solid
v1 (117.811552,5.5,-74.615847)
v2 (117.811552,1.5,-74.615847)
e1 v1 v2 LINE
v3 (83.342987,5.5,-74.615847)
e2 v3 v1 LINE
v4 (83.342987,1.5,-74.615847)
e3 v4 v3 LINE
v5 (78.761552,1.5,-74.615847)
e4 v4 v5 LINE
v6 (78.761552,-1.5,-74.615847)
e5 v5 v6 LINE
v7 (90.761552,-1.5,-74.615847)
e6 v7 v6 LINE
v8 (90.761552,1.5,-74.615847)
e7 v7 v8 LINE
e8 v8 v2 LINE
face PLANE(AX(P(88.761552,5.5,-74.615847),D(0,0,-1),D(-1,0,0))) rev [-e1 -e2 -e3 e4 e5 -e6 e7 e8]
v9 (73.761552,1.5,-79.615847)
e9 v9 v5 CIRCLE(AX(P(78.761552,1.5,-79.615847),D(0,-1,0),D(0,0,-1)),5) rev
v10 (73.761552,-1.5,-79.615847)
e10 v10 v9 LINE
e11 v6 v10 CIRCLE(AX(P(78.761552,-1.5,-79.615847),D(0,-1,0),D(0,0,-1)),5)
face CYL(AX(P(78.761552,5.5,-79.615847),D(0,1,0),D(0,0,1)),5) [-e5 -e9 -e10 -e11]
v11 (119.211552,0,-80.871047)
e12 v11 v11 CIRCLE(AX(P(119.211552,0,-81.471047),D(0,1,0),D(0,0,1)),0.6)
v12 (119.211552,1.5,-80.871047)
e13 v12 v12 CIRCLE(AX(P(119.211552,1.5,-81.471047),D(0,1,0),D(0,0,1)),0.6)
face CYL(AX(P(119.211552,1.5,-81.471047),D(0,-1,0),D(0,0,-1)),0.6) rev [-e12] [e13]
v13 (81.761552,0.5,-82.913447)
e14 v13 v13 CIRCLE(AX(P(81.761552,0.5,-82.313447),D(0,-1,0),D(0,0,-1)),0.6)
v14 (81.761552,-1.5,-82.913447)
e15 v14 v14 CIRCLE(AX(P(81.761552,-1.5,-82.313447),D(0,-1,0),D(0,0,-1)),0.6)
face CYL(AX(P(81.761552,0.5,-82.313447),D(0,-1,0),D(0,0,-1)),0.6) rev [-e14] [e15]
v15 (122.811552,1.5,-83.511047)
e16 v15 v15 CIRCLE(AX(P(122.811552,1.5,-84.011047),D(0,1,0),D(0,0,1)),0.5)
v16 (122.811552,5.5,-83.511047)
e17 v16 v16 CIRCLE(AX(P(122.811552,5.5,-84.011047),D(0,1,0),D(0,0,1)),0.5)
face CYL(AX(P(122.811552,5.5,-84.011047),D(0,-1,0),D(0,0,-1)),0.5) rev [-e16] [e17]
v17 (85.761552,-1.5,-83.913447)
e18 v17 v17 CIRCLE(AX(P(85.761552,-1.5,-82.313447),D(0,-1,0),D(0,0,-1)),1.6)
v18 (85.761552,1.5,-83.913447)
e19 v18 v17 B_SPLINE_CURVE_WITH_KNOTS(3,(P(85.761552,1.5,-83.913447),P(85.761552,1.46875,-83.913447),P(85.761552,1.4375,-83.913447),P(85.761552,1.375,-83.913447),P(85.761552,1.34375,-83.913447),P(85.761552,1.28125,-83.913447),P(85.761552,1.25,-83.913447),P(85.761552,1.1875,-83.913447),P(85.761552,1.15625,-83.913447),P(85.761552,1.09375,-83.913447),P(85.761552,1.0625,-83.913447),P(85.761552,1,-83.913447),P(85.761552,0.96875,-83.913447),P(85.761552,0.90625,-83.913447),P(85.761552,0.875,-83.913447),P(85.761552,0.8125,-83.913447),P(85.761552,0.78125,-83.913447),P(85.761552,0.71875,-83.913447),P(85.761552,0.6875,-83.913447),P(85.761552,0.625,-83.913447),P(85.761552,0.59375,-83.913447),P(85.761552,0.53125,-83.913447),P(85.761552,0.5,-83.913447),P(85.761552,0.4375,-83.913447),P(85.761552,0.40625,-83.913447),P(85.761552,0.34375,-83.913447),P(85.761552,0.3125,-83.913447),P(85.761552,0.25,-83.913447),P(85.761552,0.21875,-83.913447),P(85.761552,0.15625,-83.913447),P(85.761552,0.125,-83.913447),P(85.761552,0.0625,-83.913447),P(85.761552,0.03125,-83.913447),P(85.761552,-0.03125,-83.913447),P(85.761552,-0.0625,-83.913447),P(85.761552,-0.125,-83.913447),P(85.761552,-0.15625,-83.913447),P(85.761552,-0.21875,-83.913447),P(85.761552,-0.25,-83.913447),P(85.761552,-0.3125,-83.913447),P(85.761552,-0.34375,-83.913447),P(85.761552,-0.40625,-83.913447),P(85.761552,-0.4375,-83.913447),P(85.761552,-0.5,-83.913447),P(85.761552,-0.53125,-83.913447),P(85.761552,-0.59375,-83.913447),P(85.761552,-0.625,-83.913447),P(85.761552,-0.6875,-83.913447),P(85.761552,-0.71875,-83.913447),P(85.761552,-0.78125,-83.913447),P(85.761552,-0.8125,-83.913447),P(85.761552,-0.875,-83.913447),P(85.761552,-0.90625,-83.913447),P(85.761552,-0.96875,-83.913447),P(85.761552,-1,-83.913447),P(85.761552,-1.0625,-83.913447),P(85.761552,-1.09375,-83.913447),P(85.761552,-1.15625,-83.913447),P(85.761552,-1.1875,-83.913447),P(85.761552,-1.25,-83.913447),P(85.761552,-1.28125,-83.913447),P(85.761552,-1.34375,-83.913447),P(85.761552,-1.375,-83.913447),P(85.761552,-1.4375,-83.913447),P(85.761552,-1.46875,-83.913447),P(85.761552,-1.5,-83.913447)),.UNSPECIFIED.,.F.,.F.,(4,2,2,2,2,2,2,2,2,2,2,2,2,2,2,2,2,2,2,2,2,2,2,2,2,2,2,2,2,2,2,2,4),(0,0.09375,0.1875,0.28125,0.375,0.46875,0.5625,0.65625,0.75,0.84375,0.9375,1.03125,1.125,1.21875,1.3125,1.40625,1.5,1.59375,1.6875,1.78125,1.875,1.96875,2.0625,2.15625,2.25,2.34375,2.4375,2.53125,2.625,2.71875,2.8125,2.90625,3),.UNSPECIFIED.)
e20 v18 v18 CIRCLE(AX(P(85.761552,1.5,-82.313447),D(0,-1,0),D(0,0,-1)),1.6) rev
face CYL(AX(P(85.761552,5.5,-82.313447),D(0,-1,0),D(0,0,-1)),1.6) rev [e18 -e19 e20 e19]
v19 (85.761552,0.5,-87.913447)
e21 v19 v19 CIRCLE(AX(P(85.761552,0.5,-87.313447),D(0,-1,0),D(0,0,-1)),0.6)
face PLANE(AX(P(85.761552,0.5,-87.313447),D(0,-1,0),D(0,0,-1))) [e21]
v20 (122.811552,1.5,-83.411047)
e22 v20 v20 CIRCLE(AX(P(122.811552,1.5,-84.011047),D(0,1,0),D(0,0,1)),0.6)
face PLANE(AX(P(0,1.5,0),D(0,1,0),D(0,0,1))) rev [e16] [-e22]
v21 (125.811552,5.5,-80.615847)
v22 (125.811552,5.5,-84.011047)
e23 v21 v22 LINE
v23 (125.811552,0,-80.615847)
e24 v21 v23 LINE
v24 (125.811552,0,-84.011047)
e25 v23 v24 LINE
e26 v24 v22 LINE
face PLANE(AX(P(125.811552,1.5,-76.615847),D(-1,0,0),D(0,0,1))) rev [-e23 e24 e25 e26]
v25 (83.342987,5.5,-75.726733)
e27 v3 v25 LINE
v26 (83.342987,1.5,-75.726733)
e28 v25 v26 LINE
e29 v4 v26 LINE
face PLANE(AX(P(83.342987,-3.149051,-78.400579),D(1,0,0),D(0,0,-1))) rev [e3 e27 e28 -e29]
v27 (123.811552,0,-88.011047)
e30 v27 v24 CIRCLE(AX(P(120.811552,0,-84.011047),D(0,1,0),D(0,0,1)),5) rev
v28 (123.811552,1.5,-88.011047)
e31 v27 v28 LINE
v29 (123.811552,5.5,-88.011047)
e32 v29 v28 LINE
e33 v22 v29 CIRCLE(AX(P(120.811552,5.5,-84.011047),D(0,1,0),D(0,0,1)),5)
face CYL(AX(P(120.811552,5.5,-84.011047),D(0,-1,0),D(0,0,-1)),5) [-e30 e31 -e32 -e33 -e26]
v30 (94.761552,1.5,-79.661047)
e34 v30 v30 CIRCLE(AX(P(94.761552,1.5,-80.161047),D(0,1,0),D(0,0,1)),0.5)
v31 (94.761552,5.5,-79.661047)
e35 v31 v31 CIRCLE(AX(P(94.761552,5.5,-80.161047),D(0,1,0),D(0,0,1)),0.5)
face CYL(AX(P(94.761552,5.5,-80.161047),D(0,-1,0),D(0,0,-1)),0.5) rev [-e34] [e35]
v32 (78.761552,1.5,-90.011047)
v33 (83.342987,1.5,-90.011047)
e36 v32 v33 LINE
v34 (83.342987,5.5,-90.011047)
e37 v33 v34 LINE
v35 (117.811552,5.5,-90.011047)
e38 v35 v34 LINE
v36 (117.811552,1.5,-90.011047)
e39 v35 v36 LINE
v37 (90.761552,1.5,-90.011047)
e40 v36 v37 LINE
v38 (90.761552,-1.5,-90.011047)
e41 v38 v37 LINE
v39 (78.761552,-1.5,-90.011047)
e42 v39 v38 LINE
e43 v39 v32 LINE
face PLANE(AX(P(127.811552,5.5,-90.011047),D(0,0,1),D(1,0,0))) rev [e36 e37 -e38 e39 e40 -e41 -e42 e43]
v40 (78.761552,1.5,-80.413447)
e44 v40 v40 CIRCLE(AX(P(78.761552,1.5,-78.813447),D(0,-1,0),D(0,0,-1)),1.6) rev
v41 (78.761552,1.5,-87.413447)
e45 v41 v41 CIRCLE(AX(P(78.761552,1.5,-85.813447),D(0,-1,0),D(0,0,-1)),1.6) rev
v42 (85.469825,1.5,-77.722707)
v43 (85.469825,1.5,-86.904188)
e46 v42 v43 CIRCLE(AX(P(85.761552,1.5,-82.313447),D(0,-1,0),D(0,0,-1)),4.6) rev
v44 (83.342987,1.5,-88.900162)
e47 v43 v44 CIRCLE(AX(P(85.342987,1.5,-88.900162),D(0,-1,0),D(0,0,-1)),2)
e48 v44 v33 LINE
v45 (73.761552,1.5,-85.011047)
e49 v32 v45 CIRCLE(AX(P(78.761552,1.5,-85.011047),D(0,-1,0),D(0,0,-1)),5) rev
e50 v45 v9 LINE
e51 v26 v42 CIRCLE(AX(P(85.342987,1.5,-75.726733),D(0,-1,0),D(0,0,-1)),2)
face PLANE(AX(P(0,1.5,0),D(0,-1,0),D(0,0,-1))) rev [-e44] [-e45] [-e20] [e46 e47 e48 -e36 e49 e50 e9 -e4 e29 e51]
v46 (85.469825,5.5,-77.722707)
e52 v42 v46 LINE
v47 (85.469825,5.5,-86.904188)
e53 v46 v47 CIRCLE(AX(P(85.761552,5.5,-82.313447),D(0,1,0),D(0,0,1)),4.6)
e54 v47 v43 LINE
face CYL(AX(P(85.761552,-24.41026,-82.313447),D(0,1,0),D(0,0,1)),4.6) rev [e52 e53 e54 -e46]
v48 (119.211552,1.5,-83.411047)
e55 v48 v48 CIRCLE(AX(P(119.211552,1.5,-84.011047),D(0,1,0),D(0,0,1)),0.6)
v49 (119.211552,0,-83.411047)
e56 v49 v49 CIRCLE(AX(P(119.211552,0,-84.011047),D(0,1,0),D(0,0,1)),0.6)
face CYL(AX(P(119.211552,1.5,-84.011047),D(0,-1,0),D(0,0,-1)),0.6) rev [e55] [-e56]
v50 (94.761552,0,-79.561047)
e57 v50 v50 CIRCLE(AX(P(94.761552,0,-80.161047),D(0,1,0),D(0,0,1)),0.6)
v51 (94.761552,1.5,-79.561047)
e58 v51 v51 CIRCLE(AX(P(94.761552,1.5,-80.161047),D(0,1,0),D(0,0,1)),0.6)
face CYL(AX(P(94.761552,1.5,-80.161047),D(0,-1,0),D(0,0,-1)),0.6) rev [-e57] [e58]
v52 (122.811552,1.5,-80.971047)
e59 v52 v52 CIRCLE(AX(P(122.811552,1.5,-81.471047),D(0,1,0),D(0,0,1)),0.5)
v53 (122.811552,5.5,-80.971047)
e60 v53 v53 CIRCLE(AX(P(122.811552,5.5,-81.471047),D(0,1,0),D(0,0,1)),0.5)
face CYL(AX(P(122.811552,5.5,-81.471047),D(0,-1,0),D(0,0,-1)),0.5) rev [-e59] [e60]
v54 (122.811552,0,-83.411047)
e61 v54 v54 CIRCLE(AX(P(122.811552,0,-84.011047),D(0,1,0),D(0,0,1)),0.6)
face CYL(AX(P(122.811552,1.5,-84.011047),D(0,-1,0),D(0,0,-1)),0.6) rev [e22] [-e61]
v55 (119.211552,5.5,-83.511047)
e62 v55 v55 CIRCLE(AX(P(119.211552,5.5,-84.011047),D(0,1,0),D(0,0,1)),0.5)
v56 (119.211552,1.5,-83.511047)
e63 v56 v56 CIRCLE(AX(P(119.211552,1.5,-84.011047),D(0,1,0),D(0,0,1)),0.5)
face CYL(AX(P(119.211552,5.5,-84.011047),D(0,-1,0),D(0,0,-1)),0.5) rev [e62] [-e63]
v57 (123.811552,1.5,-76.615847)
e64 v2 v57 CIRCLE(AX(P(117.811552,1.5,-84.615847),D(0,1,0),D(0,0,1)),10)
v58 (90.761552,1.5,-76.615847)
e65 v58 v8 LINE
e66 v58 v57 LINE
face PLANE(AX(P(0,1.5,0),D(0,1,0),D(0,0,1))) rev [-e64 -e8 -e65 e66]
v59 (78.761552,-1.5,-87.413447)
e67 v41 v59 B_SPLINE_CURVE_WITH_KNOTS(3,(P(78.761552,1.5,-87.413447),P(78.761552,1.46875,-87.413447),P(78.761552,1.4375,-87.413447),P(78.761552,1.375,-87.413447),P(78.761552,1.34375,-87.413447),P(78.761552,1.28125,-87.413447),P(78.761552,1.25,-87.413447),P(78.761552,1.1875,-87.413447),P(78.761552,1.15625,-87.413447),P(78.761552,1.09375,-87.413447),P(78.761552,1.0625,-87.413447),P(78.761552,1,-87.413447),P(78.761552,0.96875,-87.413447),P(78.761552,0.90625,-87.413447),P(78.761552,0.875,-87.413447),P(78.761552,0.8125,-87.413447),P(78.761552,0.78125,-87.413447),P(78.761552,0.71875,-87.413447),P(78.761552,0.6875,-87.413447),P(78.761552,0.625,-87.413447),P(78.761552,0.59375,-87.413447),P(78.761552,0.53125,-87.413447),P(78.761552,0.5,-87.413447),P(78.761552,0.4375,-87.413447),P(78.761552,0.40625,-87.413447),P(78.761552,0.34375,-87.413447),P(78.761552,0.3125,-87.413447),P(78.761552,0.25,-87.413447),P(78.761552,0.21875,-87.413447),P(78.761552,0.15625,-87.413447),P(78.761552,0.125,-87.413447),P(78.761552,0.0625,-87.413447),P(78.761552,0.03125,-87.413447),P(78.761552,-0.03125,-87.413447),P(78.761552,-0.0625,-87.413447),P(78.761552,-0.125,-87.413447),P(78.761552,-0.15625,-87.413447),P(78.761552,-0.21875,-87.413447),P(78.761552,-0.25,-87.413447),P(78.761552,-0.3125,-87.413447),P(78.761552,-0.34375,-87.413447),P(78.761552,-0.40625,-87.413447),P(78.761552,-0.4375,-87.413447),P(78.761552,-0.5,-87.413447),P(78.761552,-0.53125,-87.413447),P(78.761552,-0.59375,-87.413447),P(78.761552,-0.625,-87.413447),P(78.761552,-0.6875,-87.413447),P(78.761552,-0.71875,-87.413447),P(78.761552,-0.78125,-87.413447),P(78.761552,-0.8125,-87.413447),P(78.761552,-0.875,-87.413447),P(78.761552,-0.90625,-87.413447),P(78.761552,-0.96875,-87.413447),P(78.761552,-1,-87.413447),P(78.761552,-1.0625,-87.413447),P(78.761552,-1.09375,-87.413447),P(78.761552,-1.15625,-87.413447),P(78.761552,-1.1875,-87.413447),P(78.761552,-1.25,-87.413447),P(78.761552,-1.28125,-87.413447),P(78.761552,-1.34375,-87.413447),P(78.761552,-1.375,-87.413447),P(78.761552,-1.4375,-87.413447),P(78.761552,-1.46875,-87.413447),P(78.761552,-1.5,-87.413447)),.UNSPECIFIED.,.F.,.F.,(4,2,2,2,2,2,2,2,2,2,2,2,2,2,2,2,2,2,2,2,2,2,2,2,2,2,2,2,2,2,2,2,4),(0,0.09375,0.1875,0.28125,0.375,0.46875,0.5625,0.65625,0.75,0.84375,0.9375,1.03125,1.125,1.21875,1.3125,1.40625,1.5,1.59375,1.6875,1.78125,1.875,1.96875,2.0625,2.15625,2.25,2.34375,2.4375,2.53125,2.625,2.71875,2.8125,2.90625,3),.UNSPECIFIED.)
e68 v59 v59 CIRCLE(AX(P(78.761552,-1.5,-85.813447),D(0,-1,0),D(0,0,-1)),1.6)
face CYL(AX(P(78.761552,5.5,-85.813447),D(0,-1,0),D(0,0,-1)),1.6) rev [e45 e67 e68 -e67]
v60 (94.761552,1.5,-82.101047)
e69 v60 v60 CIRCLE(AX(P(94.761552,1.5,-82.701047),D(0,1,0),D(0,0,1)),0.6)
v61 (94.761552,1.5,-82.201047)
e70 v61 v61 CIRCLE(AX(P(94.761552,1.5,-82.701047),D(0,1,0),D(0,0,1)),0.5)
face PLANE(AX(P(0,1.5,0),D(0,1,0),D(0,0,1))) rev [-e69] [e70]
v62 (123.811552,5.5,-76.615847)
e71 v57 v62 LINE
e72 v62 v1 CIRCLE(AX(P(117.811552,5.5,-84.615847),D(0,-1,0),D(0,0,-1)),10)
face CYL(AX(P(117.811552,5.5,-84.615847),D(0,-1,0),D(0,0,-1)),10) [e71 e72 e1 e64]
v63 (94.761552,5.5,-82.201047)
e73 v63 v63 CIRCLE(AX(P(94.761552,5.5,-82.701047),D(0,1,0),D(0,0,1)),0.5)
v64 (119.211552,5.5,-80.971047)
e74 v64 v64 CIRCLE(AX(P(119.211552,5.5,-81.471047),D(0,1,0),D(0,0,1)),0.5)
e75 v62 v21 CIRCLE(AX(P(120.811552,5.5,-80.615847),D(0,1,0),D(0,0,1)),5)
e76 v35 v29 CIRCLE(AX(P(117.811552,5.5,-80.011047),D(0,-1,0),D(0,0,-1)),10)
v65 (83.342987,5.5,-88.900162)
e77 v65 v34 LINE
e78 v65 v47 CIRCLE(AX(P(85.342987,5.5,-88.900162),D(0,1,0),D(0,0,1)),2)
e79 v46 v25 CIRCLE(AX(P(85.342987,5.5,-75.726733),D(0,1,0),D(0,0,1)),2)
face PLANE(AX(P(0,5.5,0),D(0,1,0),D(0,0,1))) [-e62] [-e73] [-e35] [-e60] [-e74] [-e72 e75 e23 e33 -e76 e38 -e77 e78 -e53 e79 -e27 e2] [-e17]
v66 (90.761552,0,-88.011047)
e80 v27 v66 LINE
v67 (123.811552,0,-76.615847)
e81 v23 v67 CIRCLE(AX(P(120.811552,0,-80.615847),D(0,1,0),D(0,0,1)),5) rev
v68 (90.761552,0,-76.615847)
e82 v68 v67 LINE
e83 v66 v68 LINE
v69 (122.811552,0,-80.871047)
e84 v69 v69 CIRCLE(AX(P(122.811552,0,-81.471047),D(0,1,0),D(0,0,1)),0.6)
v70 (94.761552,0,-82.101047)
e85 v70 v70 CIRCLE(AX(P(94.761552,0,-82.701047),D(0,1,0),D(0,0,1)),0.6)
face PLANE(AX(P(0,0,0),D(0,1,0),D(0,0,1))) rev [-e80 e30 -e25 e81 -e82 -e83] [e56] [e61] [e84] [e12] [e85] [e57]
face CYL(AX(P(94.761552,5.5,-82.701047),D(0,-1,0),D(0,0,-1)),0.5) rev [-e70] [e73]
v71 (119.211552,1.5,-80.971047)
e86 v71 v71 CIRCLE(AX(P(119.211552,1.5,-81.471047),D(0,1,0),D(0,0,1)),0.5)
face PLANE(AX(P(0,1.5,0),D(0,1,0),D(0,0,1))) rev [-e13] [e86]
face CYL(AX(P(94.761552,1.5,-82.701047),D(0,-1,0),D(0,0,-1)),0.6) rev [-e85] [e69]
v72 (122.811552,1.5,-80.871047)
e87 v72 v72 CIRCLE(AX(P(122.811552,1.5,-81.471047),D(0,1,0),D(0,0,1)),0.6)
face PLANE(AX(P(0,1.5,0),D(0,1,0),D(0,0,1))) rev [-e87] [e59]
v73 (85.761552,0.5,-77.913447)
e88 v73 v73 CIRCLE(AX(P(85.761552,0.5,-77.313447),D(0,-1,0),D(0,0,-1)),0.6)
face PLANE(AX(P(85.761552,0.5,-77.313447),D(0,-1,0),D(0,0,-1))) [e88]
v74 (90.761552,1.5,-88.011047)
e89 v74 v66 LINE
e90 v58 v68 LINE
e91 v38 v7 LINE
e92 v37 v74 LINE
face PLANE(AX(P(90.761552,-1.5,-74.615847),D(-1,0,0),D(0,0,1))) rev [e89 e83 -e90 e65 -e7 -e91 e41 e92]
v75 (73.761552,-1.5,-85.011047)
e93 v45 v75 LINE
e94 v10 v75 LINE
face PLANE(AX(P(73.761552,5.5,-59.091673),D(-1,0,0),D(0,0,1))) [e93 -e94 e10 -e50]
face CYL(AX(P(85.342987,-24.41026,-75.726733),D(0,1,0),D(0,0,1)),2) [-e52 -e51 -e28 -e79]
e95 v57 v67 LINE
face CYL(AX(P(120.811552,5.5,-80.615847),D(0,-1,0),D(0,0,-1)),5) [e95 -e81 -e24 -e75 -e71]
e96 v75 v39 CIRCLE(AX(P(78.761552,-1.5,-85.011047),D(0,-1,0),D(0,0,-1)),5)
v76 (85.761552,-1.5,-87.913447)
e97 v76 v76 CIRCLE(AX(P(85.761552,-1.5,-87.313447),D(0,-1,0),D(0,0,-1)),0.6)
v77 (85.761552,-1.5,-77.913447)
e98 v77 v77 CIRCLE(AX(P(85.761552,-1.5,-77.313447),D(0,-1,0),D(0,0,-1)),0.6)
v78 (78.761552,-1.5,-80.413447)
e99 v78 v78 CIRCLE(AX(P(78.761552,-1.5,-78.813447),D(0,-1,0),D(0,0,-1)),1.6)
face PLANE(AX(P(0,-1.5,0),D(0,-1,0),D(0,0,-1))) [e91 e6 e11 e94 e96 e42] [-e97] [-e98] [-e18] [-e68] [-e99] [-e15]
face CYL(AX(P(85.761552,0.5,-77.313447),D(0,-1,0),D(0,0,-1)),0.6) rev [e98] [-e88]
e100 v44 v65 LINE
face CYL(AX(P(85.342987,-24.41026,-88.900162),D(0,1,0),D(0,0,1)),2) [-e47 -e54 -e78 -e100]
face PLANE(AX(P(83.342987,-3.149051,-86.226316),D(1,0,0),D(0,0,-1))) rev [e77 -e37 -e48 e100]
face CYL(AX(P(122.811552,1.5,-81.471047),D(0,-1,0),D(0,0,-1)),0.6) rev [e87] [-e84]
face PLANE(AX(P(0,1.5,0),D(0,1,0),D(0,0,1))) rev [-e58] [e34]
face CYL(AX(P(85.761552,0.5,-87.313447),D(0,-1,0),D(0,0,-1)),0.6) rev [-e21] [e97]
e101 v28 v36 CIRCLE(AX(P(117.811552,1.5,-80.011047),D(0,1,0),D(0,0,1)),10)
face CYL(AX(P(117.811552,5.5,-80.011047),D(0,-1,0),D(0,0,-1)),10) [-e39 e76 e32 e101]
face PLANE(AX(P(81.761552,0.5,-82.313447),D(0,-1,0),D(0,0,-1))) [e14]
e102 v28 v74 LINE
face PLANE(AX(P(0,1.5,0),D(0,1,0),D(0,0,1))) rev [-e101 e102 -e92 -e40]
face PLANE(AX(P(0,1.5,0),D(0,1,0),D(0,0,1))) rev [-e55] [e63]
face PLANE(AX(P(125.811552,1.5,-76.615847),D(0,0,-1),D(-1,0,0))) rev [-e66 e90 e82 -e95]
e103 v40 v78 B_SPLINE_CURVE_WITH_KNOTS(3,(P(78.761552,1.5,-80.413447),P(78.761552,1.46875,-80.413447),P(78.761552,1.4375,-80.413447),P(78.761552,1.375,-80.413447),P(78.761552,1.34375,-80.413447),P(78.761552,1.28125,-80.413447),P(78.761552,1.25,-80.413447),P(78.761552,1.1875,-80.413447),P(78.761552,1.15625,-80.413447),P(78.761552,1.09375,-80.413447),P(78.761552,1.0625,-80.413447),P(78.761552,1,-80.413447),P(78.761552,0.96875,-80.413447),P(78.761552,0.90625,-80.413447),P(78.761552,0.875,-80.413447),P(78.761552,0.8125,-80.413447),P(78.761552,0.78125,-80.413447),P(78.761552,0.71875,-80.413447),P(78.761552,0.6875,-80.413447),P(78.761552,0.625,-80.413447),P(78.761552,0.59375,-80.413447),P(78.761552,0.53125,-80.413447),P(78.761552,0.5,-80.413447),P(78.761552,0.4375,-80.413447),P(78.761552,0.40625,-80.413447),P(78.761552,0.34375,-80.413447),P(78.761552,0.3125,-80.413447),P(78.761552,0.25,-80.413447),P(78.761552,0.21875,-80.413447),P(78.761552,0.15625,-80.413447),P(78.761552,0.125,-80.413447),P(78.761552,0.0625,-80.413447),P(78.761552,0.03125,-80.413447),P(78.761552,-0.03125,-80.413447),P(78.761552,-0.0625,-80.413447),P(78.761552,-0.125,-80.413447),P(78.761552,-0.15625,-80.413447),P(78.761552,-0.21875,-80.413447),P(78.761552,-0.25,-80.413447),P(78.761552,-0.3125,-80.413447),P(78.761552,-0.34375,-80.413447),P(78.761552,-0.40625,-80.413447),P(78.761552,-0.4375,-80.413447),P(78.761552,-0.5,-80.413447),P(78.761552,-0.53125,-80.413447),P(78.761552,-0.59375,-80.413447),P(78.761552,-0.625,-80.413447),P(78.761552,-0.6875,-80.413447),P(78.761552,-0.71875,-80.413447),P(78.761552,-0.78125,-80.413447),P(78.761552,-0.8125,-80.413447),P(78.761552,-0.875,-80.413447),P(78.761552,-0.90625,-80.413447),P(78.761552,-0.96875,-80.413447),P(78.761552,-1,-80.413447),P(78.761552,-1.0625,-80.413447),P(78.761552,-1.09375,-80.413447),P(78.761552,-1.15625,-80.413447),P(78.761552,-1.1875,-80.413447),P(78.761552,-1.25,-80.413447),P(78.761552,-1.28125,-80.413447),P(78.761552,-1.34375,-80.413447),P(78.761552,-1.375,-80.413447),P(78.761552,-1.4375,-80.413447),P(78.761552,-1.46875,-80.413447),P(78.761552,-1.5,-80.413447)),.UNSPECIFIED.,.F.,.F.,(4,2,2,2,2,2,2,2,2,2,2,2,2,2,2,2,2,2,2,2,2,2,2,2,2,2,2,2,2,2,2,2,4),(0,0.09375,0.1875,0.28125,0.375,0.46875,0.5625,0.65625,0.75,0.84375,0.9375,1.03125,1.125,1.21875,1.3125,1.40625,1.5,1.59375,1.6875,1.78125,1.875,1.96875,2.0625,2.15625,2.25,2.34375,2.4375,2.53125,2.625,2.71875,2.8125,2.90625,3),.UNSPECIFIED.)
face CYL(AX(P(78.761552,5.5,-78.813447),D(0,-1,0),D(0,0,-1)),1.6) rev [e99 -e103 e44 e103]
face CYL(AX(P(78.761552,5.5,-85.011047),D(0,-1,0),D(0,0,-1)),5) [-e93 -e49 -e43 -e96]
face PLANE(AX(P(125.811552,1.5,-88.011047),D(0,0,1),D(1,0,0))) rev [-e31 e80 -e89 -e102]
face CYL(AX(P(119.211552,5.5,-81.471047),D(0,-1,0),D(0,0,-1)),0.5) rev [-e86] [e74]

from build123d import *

# Parameters (mm, degrees)
SKETCH_2_W          = 35.05
SKETCH_2_H          = 11.3952
SKETCH_2_R          = 0.6
EXTRUDE_1_DEPTH     = 1.5
SKETCH_3_W          = 39.05
SKETCH_3_H          = 15.3952
SKETCH_3_R          = 0.5
EXTRUDE_2_DEPTH     = 4
SKETCH_4_W          = 15
SKETCH_4_H          = 4
EXTRUDE_3_DEPTH     = 15.3952
SKETCH_5_W          = 17
SKETCH_5_H          = 15.3952
EXTRUDE_4_DEPTH     = 3
SKETCH_6_R          = 1.6
CUT_EXTRUDE_1_DEPTH = 157.48252797
CUT_EXTRUDE_2_DEPTH = 4
CUT_EXTRUDE_4_DEPTH = 4
FILLET_2_R          = 5
CUT_EXTRUDE_5_DEPTH = 4
FILLET_3_R          = 2
SKETCH_10_R         = 0.6
CUT_EXTRUDE_6_DEPTH = 2
CUT_EXTRUDE_7_DEPTH = 157.422605654
CUT_EXTRUDE_8_DEPTH = 156.918332452
FILLET_5_R          = 5


with BuildPart() as part:
    # 草图2 → 凸台-拉伸1 (new body)
    with BuildSketch(Plane(origin=(0, 0, 0), x_dir=(1, 0, 0), z_dir=(0, 1, 0))):
        with Locations((108.28655231, 82.313447411)):
            Rectangle(SKETCH_2_W, SKETCH_2_H)
        with Locations(Location((94.76155231, 82.701047411, 0), (0, 0, 270))):
            Circle(SKETCH_2_R, mode=Mode.SUBTRACT)
        with Locations(Location((94.76155231, 80.161047411, 0), (0, 0, 270))):
            Circle(SKETCH_2_R, mode=Mode.SUBTRACT)
        with Locations(Location((119.21155231, 84.011047411, 0), (0, 0, 270))):
            Circle(SKETCH_2_R, mode=Mode.SUBTRACT)
        with Locations(Location((122.81155231, 84.011047411, 0), (0, 0, 270))):
            Circle(SKETCH_2_R, mode=Mode.SUBTRACT)
        with Locations(Location((122.81155231, 81.471047411, 0), (0, 0, 270))):
            Circle(SKETCH_2_R, mode=Mode.SUBTRACT)
        with Locations(Location((119.21155231, 81.471047411, 0), (0, 0, 270))):
            Circle(SKETCH_2_R, mode=Mode.SUBTRACT)
    extrude(amount=EXTRUDE_1_DEPTH)

    # 草图3 → 凸台-拉伸2 (add)
    with BuildSketch(Plane(origin=(0, 1.5, 0), x_dir=(1, 0, 0), z_dir=(0, 1, 0))):
        with Locations((108.28655231, 82.313447411)):
            Rectangle(SKETCH_3_W, SKETCH_3_H)
        with Locations(Location((94.76155231, 82.701047411, 0), (0, 0, 270))):
            Circle(SKETCH_3_R, mode=Mode.SUBTRACT)
        with Locations(Location((94.76155231, 80.161047411, 0), (0, 0, 270))):
            Circle(SKETCH_3_R, mode=Mode.SUBTRACT)
        with Locations(Location((119.21155231, 84.011047411, 0), (0, 0, 270))):
            Circle(SKETCH_3_R, mode=Mode.SUBTRACT)
        with Locations(Location((122.81155231, 84.011047411, 0), (0, 0, 270))):
            Circle(SKETCH_3_R, mode=Mode.SUBTRACT)
        with Locations(Location((122.81155231, 81.471047411, 0), (0, 0, 270))):
            Circle(SKETCH_3_R, mode=Mode.SUBTRACT)
        with Locations(Location((119.21155231, 81.471047411, 0), (0, 0, 270))):
            Circle(SKETCH_3_R, mode=Mode.SUBTRACT)
    extrude(amount=EXTRUDE_2_DEPTH)

    # 草图4 → 凸台-拉伸3 (add)
    with BuildSketch(Plane(origin=(0, 0, -90.011047411), x_dir=(-1, 0, 0), z_dir=(0, 0, -1))):
        with Locations((-81.26155231, 3.5)):
            Rectangle(SKETCH_4_W, SKETCH_4_H)
    extrude(amount=-EXTRUDE_3_DEPTH)

    # 草图5 → 凸台-拉伸4 (add)
    with BuildSketch(Plane.XZ.offset(-1.5)):
        with Locations((82.26155231, -82.313447411)):
            Rectangle(SKETCH_5_W, SKETCH_5_H)
    extrude(amount=EXTRUDE_4_DEPTH)

    # 草图6 → 切除-拉伸1 (cut, through all)
    with BuildSketch(Plane.XZ.offset(1.5)):
        with Locations(Location((78.76155231, -78.813447411, 0), (0, 0, 270))):
            Circle(SKETCH_6_R)
        with Locations(Location((85.76155231, -82.313447411, 0), (0, 0, 270))):
            Circle(SKETCH_6_R)
        with Locations(Location((78.76155231, -85.813447411, 0), (0, 0, 270))):
            Circle(SKETCH_6_R)
    extrude(amount=-CUT_EXTRUDE_1_DEPTH, mode=Mode.SUBTRACT)

    # 草图7 → 切除-拉伸2 (cut)
    with BuildSketch(Plane(origin=(0, 5.5, 0), x_dir=(1, 0, 0), z_dir=(0, 1, 0))):
        with BuildLine():
            ThreePointArc((83.342986542, 86.226315876), (76.648541293, 89.899421523), (75.776589998, 82.313447411))
            ThreePointArc((75.776589998, 82.313447411), (76.648541293, 74.727473299), (83.342986542, 78.400578945))
            ThreePointArc((83.342986542, 78.400578945), (90.36155231, 82.313447411), (83.342986542, 86.226315876))
        make_face()
    extrude(amount=-CUT_EXTRUDE_2_DEPTH, mode=Mode.SUBTRACT)

    # 草图8 → 切除-拉伸4 (cut)
    with BuildSketch(Plane(origin=(0, 5.5, 0), x_dir=(1, 0, 0), z_dir=(0, 1, 0))):
        with BuildLine():
            Line((76.880022549, 90.011047411), (73.76155231, 90.011047411))
            Line((73.76155231, 90.011047411), (73.76155231, 74.615847411))
            Line((73.76155231, 74.615847411), (76.880022549, 74.615847411))
            ThreePointArc((76.880022549, 74.615847411), (74.208097828, 78.160720601), (75.776589998, 82.313447411))
            ThreePointArc((75.776589998, 82.313447411), (74.208097828, 86.466174221), (76.880022549, 90.011047411))
        make_face()
    extrude(amount=-CUT_EXTRUDE_4_DEPTH, mode=Mode.SUBTRACT)

    # 圆角2
    fillet_2_edges = [part.edges().sort_by_distance(p)[0] for p in [
        (73.76155231, 0, -74.615847411),
        (73.76155231, 0, -90.011047411),
    ]]
    fillet(fillet_2_edges, radius=FILLET_2_R)

    # 草图9 → 切除-拉伸5 (cut)
    with BuildSketch(Plane(origin=(0, 5.5, 0), x_dir=(1, 0, 0), z_dir=(0, 1, 0))):
        Polygon((83.342986542, 86.226315876), (83.342986542, 90.011047411), (80.64308207, 90.011047411), align=None)
        Polygon((83.342986542, 78.400578945), (83.342986542, 74.615847411), (80.64308207, 74.615847411), align=None)
    extrude(amount=-CUT_EXTRUDE_5_DEPTH, mode=Mode.SUBTRACT)

    # 圆角3
    fillet_3_edges = [part.edges().sort_by_distance(p)[0] for p in [
        (83.342986542, 3.5, -78.400578945),
        (83.342986542, 3.5, -86.226315876),
    ]]
    fillet(fillet_3_edges, radius=FILLET_3_R)

    # 草图10 → 切除-拉伸6 (cut)
    with BuildSketch(Plane.XZ.offset(1.5)):
        with Locations(Location((81.76155231, -82.313447411, 0), (0, 0, 270))):
            Circle(SKETCH_10_R)
        with Locations(Location((85.76155231, -77.313447411, 0), (0, 0, 270))):
            Circle(SKETCH_10_R)
        with Locations(Location((85.76155231, -87.313447411, 0), (0, 0, 270))):
            Circle(SKETCH_10_R)
    extrude(amount=-CUT_EXTRUDE_6_DEPTH, mode=Mode.SUBTRACT)

    # 草图11 → 切除-拉伸7 (cut, through all)
    with BuildSketch(Plane.XZ):
        with BuildLine():
            Line((127.81155231, -74.615847411), (117.81155231, -74.615847411))
            ThreePointArc((117.81155231, -74.615847411), (120.97382997, -75.12901443), (123.811552309, -76.615847411))
            Line((123.811552309, -76.615847411), (125.81155231, -76.615847411))
            Line((125.81155231, -76.615847411), (125.81155231, -78.615847411))
            ThreePointArc((125.811552309, -78.615847411), (126.278688967, -79.295359009), (126.688253102, -80.011047411))
            ThreePointArc((126.688253102, -80.011047411), (127.249902706, -82.313447411), (126.688253102, -84.615847411))
            ThreePointArc((126.688253102, -84.615847411), (126.278688967, -85.331535812), (125.811552309, -86.011047411))
            Line((125.81155231, -86.011047411), (125.81155231, -88.011047411))
            Line((125.81155231, -88.011047411), (123.811552309, -88.011047411))
            ThreePointArc((123.811552309, -88.011047411), (120.97382997, -89.497880391), (117.81155231, -90.011047411))
            Line((117.81155231, -90.011047411), (127.81155231, -90.011047411))
            Line((127.81155231, -90.011047411), (127.811552309, -84.615847411))
            Line((127.811552309, -84.615847411), (127.811552309, -80.011047411))
            Line((127.811552309, -80.011047411), (127.81155231, -74.615847411))
        make_face()
        with BuildLine():
            Line((125.81155231, -76.615847411), (123.811552309, -76.615847411))
            ThreePointArc((123.811552309, -76.615847411), (124.882620121, -77.544779599), (125.811552309, -78.615847411))
            Line((125.81155231, -78.615847411), (125.81155231, -76.615847411))
        make_face()
        with BuildLine():
            Line((125.81155231, -88.011047411), (125.81155231, -86.011047411))
            ThreePointArc((125.811552309, -86.011047411), (124.882620121, -87.082115223), (123.811552309, -88.011047411))
            Line((123.811552309, -88.011047411), (125.81155231, -88.011047411))
        make_face()
    extrude(amount=-CUT_EXTRUDE_7_DEPTH, mode=Mode.SUBTRACT)

    # 草图12 → 切除-拉伸8 (cut, through all)
    with BuildSketch(Plane.XZ.offset(-1.5)):
        with BuildLine():
            Line((125.81155231, -78.615847411), (125.81155231, -86.011047411))
            ThreePointArc((125.81155231, -86.011047411), (126.278688967, -85.331535812), (126.688253102, -84.615847411))
            ThreePointArc((126.688253102, -84.615847411), (127.249902706, -82.313447411), (126.688253102, -80.011047411))
            ThreePointArc((126.688253102, -80.011047411), (126.278688967, -79.295359009), (125.81155231, -78.615847411))
        make_face()
    extrude(amount=-CUT_EXTRUDE_8_DEPTH, mode=Mode.SUBTRACT)

    # 圆角5
    fillet_5_edges = [part.edges().sort_by_distance(p)[0] for p in [
        (125.811552309, 2.75, -86.011047411),
        (125.811552309, 2.75, -78.615847411),
    ]]
    fillet(fillet_5_edges, radius=FILLET_5_R - 0.0001)  # a hair under: the kernel refuses the full size


solid = part.part
